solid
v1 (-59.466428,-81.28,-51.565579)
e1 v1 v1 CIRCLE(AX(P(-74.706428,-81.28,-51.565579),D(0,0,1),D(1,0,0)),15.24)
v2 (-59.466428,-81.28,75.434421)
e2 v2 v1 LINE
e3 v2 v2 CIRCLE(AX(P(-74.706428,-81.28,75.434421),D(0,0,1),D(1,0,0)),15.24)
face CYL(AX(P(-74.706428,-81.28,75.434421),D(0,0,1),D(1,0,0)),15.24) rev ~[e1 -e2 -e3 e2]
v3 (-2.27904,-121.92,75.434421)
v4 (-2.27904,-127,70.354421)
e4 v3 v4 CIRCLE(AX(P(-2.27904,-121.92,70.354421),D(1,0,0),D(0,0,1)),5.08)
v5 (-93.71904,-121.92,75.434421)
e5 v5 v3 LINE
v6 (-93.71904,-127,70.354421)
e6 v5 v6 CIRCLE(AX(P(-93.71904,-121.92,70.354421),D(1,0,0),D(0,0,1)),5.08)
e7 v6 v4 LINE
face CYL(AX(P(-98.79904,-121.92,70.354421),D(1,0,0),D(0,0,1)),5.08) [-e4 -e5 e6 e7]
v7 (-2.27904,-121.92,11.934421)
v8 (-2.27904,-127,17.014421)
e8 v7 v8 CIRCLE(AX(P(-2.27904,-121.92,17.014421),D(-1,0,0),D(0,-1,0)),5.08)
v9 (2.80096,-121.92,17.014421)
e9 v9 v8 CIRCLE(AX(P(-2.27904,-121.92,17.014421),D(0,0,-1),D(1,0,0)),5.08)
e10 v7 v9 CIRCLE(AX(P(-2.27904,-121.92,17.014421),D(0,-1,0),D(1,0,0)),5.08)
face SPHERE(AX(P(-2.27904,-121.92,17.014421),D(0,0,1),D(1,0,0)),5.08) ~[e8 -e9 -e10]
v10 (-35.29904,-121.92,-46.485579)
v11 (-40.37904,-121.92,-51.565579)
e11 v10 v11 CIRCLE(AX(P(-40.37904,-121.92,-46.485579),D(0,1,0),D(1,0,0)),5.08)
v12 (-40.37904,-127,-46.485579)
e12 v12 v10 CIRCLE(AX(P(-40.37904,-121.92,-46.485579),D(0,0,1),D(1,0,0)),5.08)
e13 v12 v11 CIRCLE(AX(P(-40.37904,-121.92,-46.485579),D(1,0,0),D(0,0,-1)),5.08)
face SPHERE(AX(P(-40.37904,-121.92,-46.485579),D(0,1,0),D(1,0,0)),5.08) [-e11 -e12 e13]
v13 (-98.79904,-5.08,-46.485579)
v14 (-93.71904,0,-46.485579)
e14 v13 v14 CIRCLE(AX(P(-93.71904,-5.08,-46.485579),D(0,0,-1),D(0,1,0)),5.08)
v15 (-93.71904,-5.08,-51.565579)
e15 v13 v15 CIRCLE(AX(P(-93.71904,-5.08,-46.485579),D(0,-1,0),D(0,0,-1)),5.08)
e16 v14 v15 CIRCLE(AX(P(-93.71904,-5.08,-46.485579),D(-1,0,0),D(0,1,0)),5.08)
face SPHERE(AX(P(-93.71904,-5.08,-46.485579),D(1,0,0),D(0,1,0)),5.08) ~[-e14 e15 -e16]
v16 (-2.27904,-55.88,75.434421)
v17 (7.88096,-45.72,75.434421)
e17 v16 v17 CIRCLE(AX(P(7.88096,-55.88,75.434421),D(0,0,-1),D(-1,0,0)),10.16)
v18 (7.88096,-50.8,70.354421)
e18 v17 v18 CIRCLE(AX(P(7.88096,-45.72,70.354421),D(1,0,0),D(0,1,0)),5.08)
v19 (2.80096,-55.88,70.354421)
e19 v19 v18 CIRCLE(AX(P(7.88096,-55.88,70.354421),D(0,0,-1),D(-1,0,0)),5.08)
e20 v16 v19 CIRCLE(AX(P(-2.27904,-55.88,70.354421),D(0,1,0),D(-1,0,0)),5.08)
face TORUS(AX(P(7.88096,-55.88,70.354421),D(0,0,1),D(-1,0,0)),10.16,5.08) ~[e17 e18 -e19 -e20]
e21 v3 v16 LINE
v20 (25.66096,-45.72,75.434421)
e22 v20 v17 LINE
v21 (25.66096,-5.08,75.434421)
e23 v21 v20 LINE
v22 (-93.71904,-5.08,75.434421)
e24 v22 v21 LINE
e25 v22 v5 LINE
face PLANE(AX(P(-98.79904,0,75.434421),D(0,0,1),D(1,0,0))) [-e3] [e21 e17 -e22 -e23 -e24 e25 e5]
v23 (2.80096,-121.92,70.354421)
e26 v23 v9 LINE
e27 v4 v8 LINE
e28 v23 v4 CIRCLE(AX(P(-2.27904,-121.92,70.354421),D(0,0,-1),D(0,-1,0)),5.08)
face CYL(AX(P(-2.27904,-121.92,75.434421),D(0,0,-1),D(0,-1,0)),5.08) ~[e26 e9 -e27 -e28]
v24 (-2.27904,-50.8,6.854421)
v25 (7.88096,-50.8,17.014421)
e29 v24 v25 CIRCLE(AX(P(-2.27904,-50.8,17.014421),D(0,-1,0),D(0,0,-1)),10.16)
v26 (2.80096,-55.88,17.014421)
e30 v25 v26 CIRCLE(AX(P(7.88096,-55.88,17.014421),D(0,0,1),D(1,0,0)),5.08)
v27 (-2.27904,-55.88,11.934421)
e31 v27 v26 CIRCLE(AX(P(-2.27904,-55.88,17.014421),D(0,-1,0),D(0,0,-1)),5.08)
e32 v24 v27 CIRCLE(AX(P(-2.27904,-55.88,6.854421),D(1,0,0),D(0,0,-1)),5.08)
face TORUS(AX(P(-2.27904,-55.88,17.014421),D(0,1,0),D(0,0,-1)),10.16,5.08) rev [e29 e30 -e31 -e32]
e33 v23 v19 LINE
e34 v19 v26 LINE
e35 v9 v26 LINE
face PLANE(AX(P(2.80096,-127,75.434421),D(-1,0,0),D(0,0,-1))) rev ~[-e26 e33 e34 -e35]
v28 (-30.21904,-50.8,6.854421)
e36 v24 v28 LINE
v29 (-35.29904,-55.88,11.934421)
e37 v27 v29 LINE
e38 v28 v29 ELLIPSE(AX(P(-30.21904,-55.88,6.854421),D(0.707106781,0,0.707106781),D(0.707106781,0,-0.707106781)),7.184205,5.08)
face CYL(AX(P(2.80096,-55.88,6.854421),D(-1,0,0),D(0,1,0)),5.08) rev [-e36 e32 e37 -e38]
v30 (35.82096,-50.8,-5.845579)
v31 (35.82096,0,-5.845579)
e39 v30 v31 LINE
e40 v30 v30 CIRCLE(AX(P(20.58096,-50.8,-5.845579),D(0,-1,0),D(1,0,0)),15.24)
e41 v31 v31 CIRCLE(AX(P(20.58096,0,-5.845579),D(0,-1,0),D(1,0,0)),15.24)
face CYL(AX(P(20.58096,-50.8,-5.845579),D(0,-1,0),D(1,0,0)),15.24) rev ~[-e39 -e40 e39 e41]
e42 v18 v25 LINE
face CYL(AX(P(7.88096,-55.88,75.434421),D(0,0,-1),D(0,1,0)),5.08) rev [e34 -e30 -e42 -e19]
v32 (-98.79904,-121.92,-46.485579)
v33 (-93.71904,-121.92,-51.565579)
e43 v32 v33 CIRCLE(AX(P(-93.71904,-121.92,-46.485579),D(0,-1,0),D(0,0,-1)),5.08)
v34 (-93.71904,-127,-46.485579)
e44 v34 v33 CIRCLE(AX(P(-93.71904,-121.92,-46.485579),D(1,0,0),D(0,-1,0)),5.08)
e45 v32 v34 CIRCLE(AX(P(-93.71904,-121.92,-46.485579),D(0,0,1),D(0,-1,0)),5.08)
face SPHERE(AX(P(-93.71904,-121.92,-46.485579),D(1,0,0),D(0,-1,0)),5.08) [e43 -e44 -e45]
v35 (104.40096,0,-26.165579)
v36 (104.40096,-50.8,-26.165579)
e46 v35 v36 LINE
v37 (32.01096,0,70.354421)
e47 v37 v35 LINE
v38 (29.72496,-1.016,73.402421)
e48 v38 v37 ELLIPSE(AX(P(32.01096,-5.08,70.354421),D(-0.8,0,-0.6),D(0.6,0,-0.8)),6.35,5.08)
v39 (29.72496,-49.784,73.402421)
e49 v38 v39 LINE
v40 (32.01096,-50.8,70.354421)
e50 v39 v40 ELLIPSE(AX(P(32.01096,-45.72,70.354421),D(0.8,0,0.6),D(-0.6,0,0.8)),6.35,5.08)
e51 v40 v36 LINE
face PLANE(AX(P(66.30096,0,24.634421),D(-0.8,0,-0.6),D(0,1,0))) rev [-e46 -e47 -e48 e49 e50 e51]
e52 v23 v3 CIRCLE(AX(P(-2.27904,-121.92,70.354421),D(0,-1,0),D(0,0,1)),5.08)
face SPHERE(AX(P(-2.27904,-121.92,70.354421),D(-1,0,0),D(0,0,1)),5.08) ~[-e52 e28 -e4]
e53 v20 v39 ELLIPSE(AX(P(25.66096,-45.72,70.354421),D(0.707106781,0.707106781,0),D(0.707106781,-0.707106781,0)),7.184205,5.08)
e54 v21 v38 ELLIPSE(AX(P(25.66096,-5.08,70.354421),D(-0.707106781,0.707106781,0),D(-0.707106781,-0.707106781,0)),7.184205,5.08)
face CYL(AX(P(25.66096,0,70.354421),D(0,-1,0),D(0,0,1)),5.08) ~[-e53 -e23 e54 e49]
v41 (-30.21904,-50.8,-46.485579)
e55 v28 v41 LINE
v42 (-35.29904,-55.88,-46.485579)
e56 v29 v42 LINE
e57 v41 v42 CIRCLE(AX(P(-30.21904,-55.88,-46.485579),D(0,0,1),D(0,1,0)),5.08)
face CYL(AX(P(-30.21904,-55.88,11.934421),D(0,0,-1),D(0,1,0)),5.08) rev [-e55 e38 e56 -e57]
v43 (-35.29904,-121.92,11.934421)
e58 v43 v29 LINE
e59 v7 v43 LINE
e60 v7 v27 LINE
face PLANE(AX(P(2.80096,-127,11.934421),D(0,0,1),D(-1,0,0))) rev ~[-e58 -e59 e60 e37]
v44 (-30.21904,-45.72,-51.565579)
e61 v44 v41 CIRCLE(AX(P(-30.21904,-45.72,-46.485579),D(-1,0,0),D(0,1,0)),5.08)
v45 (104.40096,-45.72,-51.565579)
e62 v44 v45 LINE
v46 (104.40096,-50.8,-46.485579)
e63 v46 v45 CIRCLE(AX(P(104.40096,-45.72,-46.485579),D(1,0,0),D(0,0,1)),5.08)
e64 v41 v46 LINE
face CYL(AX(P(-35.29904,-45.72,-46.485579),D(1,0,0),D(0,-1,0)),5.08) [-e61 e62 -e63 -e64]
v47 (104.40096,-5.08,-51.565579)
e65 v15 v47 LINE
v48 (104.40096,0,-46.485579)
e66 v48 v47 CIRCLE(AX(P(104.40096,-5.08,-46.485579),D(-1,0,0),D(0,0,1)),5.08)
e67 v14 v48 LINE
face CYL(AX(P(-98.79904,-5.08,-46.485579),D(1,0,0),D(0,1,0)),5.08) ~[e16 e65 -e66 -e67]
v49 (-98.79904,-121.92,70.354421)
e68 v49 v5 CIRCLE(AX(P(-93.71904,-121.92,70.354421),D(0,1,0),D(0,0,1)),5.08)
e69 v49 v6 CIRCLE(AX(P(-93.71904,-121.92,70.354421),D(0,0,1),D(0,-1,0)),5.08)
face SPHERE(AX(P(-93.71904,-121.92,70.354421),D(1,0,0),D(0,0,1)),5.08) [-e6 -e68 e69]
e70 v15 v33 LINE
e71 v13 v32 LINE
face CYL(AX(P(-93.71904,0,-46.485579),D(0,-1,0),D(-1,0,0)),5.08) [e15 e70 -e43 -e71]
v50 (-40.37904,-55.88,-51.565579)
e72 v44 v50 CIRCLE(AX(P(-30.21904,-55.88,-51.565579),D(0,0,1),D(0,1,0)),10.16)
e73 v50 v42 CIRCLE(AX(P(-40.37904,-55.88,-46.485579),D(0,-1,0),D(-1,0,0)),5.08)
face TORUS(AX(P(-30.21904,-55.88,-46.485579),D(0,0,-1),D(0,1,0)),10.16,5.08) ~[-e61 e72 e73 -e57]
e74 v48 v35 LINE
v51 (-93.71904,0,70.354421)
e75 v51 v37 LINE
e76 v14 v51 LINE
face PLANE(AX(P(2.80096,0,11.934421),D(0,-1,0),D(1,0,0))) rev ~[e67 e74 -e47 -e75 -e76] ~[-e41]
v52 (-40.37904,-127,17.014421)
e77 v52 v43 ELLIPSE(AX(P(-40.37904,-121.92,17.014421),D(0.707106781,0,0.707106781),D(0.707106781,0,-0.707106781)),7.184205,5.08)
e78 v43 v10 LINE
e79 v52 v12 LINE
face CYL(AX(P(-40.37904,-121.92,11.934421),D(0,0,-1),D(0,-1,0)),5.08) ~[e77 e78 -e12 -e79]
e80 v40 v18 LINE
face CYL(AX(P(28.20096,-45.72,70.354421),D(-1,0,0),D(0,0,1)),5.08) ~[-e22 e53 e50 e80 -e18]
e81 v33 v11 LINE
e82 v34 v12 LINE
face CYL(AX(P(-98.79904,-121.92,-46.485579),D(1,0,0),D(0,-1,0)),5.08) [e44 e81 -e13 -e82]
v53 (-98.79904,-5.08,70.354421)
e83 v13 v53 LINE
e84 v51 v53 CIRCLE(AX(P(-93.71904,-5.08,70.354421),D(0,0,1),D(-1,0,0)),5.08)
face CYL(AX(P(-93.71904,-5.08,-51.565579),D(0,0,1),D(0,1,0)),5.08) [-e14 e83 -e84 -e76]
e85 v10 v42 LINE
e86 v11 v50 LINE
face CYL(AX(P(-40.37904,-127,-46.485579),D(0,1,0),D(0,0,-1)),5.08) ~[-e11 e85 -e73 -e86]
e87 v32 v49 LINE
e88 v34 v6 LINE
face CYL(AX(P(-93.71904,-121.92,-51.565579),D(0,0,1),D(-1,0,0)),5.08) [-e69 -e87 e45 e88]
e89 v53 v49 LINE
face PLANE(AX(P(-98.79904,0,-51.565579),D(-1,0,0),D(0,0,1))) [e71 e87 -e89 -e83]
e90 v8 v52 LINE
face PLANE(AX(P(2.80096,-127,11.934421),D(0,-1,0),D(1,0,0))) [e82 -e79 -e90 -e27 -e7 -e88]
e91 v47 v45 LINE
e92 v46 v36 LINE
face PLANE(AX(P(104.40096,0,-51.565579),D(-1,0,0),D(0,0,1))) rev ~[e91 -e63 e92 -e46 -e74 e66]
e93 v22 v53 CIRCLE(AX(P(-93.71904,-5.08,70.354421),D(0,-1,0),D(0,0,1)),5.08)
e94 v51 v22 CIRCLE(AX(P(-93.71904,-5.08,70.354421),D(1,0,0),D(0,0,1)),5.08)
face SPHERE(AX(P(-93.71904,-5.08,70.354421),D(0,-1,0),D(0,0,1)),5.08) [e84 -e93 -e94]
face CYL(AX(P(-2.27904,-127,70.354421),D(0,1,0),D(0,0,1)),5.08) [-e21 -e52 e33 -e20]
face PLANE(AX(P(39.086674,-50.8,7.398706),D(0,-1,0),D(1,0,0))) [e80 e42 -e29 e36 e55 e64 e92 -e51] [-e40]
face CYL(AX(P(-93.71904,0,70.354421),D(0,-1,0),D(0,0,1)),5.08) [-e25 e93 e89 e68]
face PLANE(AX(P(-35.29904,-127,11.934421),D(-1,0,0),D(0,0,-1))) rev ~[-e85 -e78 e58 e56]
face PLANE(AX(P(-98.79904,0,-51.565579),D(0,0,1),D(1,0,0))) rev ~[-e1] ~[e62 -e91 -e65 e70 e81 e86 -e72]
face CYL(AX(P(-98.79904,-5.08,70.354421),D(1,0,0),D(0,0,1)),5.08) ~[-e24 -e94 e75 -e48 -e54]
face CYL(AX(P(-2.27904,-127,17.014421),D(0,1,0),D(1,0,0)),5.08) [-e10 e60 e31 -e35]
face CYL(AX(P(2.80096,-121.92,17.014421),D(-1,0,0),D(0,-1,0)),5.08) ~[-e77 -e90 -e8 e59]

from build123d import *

# Parameters (mm, degrees)
F0_W      = 203.2
F0_H      = 127
F1_DEPTH  = 127
F3_DEPTH  = 76.2
F4_SIZE2  = 101.6
F4_SIZE   = 76.2
F5_R      = 5.08
F6_R      = 15.24
F7_DEPTH  = 50.801
F8_R      = 15.24
F10_DEPTH = 127.001


with BuildPart() as f1:
    # F0 (on Front) → F1 (new body)
    with BuildSketch(Plane.XZ):
        with Locations((2.8009600937, 11.9344207702)):
            Rectangle(F0_W, F0_H)
    extrude(amount=F1_DEPTH)

    # F2 (on face) → F3 (cut)
    with BuildSketch(Plane.XZ.offset(127)):
        Polygon((-35.2990399063, 11.9344207702), (-35.2990399063, -51.5655792298), (104.4009600937, -51.5655792298), (104.4009600937, 75.4344207702), (2.8009600937, 75.4344207702), (2.8009600937, 11.9344207702), align=None)
    extrude(amount=-F3_DEPTH, mode=Mode.SUBTRACT)

    # F4
    f4_edges = [f1.edges().sort_by_distance(p)[0] for p in [
        (104.40096, -25.4, 75.434421),
    ]]
    f4_side = f1.faces().sort_by_distance((-18.970468, -52.614286, 75.434421))[0]
    chamfer(f4_edges, length=F4_SIZE, length2=F4_SIZE2, reference=f4_side)

    # F5
    f5_edges = [f1.edges().sort_by_distance(p)[0] for p in [
        (-47.99904, -127, 75.434421),
        (-98.79904, -63.5, 75.434421),
        (-35.29904, 0, 75.434421),
        (2.80096, -88.9, 75.434421),
        (15.50096, -50.8, 75.434421),
        (2.80096, -50.8, 43.684421),
        (2.80096, -127, 43.684421),
        (2.80096, -88.9, 11.934421),
        (-35.29904, -50.8, -19.815579),
        (34.55096, -50.8, -51.565579),
        (-35.29904, -88.9, -51.565579),
        (-35.29904, -127, -19.815579),
        (-67.04904, -127, -51.565579),
        (-98.79904, -127, 11.934421),
        (2.80096, 0, -51.565579),
        (-98.79904, 0, 11.934421),
        (-98.79904, -63.5, -51.565579),
        (28.20096, -25.4, 75.434421),
        (-16.24904, -127, 11.934421),
        (-16.24904, -50.8, 11.934421),
    ]]
    fillet(f5_edges, radius=F5_R)

    # F6 (on face) → F7 (cut, through all)
    with BuildSketch(Plane.XZ.offset(50.8)):
        with Locations((20.5809600937, -5.8455792298)):
            Circle(F6_R)
    extrude(amount=-F7_DEPTH, mode=Mode.SUBTRACT)

    # F8 (on face) → F10 (cut, through all)
    with BuildSketch(Plane.XY.offset(75.4344207702)):
        with Locations((-74.706427753, -81.28)):
            Circle(F8_R)
    extrude(amount=-F10_DEPTH, mode=Mode.SUBTRACT)


solid = f1.part
